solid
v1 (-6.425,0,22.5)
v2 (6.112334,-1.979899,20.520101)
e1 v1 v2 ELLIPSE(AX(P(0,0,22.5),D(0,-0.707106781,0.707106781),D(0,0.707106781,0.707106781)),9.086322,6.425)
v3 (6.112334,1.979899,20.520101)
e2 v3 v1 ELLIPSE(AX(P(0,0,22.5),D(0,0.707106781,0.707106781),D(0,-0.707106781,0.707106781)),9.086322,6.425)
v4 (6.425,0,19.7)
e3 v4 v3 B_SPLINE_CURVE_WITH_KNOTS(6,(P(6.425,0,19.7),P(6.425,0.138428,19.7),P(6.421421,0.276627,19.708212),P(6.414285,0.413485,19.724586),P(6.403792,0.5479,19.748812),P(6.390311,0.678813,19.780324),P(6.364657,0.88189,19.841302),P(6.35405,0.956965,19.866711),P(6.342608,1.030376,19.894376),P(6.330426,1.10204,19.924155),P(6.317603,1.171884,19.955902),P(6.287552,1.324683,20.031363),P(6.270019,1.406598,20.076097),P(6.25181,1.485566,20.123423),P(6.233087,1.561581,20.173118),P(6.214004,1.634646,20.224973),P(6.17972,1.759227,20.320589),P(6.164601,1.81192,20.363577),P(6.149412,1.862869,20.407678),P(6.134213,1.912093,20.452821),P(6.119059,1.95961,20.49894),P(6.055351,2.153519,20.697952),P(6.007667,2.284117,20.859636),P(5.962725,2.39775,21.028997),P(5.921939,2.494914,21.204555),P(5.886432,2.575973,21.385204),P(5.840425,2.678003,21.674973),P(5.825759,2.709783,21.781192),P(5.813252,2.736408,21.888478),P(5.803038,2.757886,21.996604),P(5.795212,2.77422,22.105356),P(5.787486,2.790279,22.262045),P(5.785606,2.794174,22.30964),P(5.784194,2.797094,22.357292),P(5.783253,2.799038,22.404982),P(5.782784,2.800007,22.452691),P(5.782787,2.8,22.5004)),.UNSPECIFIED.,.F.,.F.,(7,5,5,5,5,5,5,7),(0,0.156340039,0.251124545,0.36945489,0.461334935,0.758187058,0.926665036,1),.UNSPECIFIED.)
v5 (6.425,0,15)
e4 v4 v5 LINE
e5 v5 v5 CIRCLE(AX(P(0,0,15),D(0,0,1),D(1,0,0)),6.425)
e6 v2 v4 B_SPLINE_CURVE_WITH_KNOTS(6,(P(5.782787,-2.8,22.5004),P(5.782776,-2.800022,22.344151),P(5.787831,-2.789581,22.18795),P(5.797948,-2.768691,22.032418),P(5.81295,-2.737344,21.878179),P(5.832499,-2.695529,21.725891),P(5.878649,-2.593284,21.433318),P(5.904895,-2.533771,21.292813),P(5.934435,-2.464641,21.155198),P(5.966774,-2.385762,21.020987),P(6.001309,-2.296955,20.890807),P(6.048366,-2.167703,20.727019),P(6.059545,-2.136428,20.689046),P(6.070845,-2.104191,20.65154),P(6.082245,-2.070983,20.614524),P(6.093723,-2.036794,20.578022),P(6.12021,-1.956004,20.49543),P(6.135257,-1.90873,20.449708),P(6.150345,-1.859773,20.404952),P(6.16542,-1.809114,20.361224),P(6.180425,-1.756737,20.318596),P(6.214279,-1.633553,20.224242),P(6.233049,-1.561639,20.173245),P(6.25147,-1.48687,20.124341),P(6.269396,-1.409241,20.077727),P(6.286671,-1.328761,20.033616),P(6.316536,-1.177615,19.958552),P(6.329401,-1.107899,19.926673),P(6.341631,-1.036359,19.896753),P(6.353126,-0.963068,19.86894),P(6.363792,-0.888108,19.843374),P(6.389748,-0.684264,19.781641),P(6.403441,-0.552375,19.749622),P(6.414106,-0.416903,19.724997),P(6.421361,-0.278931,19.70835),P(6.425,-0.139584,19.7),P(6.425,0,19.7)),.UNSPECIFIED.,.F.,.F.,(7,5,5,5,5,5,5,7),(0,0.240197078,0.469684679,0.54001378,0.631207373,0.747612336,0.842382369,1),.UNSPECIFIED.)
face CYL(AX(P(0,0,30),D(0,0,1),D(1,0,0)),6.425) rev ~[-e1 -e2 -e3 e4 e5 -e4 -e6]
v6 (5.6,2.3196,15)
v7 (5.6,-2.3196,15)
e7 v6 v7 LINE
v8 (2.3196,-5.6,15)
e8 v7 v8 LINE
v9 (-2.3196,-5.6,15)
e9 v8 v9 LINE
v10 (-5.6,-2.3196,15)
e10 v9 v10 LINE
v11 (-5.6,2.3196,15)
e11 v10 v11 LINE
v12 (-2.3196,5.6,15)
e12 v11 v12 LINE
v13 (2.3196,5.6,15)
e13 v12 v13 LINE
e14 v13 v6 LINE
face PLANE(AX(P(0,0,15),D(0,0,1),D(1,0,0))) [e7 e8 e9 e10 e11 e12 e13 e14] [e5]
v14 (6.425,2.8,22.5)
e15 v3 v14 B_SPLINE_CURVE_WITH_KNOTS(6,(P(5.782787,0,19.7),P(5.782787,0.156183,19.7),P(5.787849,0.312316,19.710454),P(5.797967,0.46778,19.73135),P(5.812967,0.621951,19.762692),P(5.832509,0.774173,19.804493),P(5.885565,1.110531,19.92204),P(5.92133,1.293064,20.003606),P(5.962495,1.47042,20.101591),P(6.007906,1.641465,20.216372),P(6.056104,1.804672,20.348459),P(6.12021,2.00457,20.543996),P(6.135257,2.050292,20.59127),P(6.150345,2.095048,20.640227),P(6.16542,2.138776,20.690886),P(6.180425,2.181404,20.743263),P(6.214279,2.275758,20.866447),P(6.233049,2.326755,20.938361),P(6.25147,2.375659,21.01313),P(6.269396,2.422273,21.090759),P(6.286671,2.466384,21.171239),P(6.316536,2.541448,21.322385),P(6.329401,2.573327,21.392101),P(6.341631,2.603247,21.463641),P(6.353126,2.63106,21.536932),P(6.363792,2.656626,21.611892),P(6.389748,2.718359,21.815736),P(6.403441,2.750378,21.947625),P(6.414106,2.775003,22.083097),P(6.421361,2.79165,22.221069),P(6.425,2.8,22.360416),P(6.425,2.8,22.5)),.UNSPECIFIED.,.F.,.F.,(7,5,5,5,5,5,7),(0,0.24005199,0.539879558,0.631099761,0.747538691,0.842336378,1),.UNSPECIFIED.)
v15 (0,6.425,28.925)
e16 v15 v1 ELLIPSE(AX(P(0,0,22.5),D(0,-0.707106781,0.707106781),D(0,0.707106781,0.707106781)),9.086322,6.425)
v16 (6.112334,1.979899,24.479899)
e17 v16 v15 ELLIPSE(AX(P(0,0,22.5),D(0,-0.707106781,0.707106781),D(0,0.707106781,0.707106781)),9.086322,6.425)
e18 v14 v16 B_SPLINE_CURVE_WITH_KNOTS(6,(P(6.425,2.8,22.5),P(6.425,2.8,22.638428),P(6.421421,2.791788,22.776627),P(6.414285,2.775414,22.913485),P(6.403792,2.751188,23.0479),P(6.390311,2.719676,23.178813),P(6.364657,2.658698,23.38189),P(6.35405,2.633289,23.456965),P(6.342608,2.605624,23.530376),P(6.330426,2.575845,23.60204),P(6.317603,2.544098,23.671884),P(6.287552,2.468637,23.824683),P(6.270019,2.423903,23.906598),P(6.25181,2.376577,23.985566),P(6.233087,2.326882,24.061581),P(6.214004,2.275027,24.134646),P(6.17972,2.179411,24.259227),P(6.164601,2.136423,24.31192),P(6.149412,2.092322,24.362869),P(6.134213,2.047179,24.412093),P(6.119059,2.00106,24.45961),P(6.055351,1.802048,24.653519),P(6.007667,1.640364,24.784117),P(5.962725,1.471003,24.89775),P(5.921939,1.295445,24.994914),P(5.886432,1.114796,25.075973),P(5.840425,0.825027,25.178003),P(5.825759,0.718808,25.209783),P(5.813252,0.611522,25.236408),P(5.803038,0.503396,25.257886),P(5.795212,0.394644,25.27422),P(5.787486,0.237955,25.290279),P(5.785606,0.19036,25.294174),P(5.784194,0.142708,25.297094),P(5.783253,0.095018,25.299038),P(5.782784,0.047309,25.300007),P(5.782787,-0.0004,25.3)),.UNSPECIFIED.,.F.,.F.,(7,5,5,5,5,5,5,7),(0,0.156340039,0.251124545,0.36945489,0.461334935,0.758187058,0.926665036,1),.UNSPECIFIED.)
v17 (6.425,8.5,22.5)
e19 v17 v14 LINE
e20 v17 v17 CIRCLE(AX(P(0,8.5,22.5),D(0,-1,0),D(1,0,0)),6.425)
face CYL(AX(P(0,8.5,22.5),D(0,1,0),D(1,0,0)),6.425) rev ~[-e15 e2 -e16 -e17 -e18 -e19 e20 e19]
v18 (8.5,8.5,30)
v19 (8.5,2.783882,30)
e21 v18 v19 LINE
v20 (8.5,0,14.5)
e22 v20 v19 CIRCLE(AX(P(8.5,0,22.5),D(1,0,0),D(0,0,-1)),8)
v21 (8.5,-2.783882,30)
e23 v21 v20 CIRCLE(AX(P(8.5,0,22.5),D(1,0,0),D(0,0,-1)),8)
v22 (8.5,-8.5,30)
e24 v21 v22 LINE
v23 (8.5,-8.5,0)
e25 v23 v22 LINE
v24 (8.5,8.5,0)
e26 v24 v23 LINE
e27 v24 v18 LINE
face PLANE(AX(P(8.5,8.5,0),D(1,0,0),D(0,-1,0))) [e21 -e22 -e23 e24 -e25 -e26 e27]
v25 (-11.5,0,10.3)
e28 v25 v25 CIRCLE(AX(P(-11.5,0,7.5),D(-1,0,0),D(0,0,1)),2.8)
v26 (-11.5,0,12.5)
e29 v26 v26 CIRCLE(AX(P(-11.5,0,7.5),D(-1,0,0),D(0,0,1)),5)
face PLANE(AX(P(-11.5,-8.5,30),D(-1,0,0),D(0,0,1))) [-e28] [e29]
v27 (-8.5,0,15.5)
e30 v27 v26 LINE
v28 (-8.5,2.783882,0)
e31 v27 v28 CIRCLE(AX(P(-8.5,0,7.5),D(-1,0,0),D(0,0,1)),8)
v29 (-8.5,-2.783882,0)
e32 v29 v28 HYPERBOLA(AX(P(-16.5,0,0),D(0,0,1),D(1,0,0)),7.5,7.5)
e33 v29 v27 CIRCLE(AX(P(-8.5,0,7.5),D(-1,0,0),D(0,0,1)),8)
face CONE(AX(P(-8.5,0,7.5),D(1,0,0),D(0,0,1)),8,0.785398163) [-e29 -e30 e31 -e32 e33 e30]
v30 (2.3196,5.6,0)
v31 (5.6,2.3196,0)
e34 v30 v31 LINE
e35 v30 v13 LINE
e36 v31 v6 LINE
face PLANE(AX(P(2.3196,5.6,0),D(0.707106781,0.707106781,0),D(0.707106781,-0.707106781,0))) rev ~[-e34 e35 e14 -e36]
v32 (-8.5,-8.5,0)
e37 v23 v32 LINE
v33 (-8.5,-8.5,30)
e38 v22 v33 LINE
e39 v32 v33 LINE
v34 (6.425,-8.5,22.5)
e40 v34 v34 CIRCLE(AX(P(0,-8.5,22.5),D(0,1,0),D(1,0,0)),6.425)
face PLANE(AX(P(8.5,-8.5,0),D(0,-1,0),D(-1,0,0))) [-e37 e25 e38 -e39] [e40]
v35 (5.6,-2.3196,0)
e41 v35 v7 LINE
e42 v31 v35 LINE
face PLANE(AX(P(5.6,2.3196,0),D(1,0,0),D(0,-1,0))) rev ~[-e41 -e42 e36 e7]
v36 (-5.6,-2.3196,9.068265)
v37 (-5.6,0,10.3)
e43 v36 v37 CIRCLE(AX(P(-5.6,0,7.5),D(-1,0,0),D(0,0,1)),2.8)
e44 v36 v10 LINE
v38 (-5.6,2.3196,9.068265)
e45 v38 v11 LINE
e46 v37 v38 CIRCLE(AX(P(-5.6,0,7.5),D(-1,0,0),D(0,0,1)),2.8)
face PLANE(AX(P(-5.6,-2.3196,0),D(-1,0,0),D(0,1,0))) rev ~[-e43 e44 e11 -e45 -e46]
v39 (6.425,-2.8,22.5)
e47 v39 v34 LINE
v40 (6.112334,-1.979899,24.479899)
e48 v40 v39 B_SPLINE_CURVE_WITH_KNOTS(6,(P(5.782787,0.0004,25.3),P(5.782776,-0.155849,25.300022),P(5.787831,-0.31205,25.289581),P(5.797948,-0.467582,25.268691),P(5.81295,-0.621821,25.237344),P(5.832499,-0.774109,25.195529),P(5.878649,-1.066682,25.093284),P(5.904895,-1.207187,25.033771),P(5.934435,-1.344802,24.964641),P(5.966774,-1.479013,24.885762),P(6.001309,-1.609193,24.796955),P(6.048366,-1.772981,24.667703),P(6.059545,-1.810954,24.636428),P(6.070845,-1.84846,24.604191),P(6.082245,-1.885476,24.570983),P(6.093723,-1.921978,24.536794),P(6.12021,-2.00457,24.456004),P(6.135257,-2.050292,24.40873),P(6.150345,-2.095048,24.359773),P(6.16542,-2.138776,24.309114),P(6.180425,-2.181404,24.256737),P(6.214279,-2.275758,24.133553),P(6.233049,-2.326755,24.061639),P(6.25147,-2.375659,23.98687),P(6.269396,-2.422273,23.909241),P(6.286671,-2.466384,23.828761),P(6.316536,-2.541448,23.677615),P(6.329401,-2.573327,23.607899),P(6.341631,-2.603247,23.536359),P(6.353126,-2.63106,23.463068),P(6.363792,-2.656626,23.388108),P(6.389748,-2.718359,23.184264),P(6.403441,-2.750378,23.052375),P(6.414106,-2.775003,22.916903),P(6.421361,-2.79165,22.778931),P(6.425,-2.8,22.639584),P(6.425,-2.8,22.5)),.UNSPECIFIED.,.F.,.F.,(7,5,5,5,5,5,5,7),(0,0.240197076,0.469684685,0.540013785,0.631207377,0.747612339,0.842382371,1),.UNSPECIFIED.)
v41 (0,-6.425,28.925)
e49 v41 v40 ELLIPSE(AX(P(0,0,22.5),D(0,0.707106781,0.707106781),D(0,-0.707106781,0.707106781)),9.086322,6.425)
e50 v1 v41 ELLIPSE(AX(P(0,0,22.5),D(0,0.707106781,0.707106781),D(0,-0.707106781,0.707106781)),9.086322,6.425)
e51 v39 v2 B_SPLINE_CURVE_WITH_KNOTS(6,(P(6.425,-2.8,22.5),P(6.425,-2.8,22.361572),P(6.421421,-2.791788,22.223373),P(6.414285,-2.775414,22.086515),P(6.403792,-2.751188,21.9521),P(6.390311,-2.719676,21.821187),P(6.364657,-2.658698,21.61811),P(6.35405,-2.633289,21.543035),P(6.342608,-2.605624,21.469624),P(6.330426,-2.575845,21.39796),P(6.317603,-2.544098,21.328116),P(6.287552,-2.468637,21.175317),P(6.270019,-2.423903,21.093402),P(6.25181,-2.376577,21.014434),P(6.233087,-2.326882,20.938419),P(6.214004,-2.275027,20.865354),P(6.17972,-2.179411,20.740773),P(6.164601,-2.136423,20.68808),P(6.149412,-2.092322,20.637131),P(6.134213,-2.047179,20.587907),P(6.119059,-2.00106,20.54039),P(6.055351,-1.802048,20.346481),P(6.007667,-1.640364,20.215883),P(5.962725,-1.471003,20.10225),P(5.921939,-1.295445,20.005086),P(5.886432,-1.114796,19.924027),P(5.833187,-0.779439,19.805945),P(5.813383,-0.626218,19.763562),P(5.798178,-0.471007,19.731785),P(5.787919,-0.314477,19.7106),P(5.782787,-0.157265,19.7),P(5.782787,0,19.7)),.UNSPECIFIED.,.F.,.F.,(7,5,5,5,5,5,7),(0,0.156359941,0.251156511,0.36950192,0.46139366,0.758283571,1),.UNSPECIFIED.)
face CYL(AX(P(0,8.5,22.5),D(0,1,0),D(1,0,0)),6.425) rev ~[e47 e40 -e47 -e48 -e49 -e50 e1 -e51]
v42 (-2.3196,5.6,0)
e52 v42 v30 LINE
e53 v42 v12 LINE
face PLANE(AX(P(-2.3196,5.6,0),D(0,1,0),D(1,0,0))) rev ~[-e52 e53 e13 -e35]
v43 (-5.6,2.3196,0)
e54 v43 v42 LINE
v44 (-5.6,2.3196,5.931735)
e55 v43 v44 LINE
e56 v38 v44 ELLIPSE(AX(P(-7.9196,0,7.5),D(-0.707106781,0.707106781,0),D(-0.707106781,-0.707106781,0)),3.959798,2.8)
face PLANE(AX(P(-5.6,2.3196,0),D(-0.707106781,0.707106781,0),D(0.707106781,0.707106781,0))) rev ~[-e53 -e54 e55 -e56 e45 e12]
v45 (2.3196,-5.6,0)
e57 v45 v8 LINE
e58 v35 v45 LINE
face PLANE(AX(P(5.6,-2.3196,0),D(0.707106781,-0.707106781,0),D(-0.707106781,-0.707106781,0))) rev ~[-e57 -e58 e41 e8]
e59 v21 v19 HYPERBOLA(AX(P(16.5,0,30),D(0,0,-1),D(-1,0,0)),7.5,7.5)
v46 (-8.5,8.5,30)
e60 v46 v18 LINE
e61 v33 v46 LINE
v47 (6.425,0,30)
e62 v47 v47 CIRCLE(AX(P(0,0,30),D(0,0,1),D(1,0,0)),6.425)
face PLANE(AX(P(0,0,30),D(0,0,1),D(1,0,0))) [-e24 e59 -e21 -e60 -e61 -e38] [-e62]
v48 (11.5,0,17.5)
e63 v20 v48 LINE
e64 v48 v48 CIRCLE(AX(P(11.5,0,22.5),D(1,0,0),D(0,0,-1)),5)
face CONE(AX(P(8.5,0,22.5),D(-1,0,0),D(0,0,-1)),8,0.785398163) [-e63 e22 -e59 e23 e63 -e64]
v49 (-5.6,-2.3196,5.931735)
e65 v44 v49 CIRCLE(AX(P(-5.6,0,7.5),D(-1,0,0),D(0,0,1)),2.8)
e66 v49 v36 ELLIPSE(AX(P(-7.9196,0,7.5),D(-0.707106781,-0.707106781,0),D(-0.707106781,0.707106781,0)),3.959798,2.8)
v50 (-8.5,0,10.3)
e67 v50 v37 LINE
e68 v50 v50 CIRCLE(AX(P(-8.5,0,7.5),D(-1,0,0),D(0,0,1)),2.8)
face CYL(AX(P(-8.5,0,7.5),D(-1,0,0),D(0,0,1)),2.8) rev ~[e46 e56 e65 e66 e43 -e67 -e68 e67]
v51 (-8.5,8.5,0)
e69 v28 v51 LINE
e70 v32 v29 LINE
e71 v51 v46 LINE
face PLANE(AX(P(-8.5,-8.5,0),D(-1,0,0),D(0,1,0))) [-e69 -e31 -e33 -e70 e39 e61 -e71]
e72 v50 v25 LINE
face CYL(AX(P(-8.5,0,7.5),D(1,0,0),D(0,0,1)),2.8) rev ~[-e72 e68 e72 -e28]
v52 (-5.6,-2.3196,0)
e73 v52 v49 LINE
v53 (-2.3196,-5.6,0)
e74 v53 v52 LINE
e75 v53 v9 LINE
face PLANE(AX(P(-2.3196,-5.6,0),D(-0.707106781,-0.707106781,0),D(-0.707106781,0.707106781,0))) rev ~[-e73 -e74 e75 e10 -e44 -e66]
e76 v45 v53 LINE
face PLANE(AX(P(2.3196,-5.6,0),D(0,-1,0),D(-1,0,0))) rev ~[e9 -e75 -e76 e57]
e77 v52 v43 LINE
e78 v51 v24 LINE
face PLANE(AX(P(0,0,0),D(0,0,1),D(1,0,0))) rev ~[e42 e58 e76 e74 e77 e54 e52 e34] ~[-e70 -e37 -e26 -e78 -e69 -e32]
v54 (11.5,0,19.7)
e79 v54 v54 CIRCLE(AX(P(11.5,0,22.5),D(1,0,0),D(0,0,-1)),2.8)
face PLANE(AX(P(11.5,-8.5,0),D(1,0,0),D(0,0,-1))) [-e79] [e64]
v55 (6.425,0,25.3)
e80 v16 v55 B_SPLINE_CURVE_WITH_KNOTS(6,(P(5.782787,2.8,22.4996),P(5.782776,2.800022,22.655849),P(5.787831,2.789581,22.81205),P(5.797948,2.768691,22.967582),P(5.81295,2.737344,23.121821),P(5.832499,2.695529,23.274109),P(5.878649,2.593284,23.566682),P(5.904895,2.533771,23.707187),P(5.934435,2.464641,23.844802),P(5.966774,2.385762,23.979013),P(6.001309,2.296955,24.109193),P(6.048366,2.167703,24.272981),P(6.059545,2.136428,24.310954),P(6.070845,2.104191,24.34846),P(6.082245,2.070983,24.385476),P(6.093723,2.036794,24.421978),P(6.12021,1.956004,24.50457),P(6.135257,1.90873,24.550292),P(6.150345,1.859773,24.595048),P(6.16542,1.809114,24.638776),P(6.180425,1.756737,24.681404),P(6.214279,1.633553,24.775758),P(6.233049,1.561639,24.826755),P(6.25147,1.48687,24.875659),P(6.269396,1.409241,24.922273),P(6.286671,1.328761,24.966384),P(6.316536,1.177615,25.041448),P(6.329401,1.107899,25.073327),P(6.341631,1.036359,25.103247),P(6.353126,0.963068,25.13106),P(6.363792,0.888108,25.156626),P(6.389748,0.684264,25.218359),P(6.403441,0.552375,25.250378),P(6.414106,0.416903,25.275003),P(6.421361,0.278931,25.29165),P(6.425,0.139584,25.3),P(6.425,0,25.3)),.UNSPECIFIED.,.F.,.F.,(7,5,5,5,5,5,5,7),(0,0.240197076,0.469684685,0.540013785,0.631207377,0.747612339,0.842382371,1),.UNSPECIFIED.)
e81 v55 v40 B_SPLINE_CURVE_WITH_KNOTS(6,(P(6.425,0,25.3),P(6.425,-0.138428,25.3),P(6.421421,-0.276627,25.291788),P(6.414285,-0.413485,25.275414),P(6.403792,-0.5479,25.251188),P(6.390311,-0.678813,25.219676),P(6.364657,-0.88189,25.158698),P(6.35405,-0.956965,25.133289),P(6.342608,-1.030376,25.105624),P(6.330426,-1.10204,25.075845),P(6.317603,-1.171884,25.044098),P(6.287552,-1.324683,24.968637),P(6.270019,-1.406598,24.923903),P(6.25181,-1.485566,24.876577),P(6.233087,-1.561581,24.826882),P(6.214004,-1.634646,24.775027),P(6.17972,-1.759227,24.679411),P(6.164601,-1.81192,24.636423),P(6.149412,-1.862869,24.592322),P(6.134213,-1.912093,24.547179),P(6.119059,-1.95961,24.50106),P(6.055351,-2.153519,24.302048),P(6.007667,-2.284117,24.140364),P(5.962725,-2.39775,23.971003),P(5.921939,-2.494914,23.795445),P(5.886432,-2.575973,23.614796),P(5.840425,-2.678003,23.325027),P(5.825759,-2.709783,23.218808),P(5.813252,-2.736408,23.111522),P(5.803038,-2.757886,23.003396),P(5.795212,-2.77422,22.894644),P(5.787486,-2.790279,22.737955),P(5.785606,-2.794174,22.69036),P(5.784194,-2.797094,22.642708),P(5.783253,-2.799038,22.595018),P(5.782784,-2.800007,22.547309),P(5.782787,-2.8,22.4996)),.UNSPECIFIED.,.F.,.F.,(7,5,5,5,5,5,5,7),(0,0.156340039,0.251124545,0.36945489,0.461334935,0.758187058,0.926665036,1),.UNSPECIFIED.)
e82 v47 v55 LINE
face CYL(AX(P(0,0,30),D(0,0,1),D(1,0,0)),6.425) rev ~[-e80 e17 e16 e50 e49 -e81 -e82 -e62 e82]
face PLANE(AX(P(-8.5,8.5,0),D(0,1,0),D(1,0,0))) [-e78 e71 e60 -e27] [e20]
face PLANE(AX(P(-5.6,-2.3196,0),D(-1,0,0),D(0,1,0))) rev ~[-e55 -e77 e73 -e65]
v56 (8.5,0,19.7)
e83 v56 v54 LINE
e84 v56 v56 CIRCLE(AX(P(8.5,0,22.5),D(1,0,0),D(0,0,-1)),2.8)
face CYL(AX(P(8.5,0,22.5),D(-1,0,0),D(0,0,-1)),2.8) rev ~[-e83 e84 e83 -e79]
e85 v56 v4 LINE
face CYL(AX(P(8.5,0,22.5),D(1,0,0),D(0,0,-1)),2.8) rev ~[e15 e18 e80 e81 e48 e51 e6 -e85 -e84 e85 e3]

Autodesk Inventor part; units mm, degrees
ref_plane "YZ Plane" through (0, 0, 0) normal (1, 0, 0) x (0, 1, 0)
ref_plane "XZ Plane" through (0, 0, 0) normal (0, 1, 0) x (-1, 0, 0)
ref_plane "XY Plane" through (0, 0, 0) normal (0, 0, 1) x (1, 0, 0)
sketch "Sketch1" plane through (0, 0, 0) normal (0, 0, 1) x (1, 0, 0)
  line L0 (-8.5, 8.5) -> (8.5, 8.5)
  line L1 (8.5, 8.5) -> (8.5, -8.5)
  line L2 (8.5, -8.5) -> (-8.5, -8.5)
  line L3 (-8.5, -8.5) -> (-8.5, 8.5)
  line L4 (-8.5, 8.5) -> (8.5, -8.5) construction
  line L5 (8.5, 8.5) -> (-8.5, -8.5) construction
  line L6 (5.5, -2.2782) -> (2.2782, -5.5)
  line L7 (2.2782, -5.5) -> (-2.2782, -5.5)
  line L8 (-2.2782, -5.5) -> (-5.5, -2.2782)
  line L9 (-5.5, -2.2782) -> (-5.5, 2.2782)
  line L10 (-5.5, 2.2782) -> (-2.2782, 5.5)
  line L11 (-2.2782, 5.5) -> (2.2782, 5.5)
  line L12 (2.2782, 5.5) -> (5.5, 2.2782)
  line L13 (5.5, 2.2782) -> (5.5, -2.2782)
  line L14 (5.6, -2.3196) -> (2.3196, -5.6)
  line L15 (2.3196, -5.6) -> (-2.3196, -5.6)
  line L16 (-2.3196, -5.6) -> (-5.6, -2.3196)
  line L17 (-5.6, -2.3196) -> (-5.6, 2.3196)
  line L18 (-5.6, 2.3196) -> (-2.3196, 5.6)
  line L19 (-2.3196, 5.6) -> (2.3196, 5.6)
  line L20 (2.3196, 5.6) -> (5.6, 2.3196)
  line L21 (5.6, 2.3196) -> (5.6, -2.3196)
  point P0 (0, 0)
  dimension "d2" = 17
  dimension "d3" = 17
  dimension "d28" = 11
  dimension "d29" = 0.1
extrude "Extrusion1" add sketch "Sketch1" along normal blind 30 contours L0 L1 L2 L3 | L6 L7 L8 L9 L10 L11 L12 L13 | L14 L15 L16 L17 L18 L19 L20 L21
extrude "Extrusion2" cut sketch "Sketch1" along normal blind 15 contours L6 L7 L8 L9 L10 L11 L12 L13 | L14 L15 L16 L17 L18 L19 L20 L21
sketch "Sketch2" plane through (0, 0, 30) normal (0, 0, 1) x (1, 0, 0)
  circle A0 centre (0, 0) radius 6.425
  dimension "d8" = 12.85
extrude "Extrusion3" cut sketch "Sketch2" against normal blind 15
sketch "Sketch3" plane through (-8.5, 8.5, 0) normal (0, 1, 0) x (1, 0, 0)
  line L0 (17, 0) -> (0, 0) projected
  line L1 (0, 0) -> (0, -30) projected
  line L2 (17, -30) -> (0, -30) projected
  line L3 (17, 0) -> (17, -30) projected
  line L4 (0, 0) -> (0, -30) construction
  line L5 (0, -30) -> (17, -15)
  line L6 (17, 0) -> (17, -30) construction
  circle A0 centre (8.5, -22.5) radius 6.425
  line L7 (17, -30) -> (0, -15)
  line L8 (0, 0) -> (0, -30) construction
  point P0 (8.5, 0)
  dimension "d11" = 12.85
extrude "Extrusion4" cut sketch "Sketch3" against normal through all contours A0 L7 L5 | L5 L7 A0 | L7 L5 A0 | A0 L5 L7
sketch "Sketch4" plane through (8.5, -8.5, 0) normal (1, 0, 0) x (0, 0, -1)
  line L0 (0, 17) -> (-30, 17) construction
  line L1 (-15, 17) -> (-15, 0) construction
  line L2 (0, 0) -> (-30, 0) construction
  line L3 (-30, 17) -> (-30, 0) construction
  line L4 (-30, 17) -> (-15, 0) construction
  line L5 (-15, 17) -> (-30, 0) construction
  circle A0 centre (-22.5, 8.5) radius 2.8
  circle A1 centre (-22.5, 8.5) radius 5
  point P0 (0, 8.5)
  dimension "d14" = 5.6
  dimension "d15" = 10
ref_plane "Work Plane1" through (-8.5, 0, 0) normal (0, -1, 0) x (1, 0, 0)
sketch "Sketch5" plane through (-8.5, 0, 0) normal (0, -1, 0) x (1, 0, 0)
  line L0 (17, 0) -> (17, 30) construction
  line L1 (0, 0) -> (0, 30) construction
  line L2 (17, 0) -> (0, 0) construction
  line L3 (17, 30) -> (0, 30) construction
  point P0 (8.5, 0)
  point P1 (17, 22.5)
  point P2 (0, 7.5)
  dimension "d23" = 7.5
  dimension "d24" = 7.5
extrude "Extrusion5" add sketch "Sketch4" along normal blind 3
extrude "Extrusion6" cut sketch "Sketch4" against normal blind 5 contours A0
pattern_sketch "Sketch Driven Pattern1" of "Extrusion6", "Extrusion5" from (8.5, 0, 22.5) facing (1, 0, 0) copies at (-8.5, 0, 7.5) facing (-1, 0, 0)
chamfer "Chamfer2" distance 3 angle 45 2 edges at (8.5, 0, 27.5) (-8.5, 0, 2.5)
equation "\"d2\" = d3"
equation "\"d23\" = d24"
properties part number "waxing_station"
